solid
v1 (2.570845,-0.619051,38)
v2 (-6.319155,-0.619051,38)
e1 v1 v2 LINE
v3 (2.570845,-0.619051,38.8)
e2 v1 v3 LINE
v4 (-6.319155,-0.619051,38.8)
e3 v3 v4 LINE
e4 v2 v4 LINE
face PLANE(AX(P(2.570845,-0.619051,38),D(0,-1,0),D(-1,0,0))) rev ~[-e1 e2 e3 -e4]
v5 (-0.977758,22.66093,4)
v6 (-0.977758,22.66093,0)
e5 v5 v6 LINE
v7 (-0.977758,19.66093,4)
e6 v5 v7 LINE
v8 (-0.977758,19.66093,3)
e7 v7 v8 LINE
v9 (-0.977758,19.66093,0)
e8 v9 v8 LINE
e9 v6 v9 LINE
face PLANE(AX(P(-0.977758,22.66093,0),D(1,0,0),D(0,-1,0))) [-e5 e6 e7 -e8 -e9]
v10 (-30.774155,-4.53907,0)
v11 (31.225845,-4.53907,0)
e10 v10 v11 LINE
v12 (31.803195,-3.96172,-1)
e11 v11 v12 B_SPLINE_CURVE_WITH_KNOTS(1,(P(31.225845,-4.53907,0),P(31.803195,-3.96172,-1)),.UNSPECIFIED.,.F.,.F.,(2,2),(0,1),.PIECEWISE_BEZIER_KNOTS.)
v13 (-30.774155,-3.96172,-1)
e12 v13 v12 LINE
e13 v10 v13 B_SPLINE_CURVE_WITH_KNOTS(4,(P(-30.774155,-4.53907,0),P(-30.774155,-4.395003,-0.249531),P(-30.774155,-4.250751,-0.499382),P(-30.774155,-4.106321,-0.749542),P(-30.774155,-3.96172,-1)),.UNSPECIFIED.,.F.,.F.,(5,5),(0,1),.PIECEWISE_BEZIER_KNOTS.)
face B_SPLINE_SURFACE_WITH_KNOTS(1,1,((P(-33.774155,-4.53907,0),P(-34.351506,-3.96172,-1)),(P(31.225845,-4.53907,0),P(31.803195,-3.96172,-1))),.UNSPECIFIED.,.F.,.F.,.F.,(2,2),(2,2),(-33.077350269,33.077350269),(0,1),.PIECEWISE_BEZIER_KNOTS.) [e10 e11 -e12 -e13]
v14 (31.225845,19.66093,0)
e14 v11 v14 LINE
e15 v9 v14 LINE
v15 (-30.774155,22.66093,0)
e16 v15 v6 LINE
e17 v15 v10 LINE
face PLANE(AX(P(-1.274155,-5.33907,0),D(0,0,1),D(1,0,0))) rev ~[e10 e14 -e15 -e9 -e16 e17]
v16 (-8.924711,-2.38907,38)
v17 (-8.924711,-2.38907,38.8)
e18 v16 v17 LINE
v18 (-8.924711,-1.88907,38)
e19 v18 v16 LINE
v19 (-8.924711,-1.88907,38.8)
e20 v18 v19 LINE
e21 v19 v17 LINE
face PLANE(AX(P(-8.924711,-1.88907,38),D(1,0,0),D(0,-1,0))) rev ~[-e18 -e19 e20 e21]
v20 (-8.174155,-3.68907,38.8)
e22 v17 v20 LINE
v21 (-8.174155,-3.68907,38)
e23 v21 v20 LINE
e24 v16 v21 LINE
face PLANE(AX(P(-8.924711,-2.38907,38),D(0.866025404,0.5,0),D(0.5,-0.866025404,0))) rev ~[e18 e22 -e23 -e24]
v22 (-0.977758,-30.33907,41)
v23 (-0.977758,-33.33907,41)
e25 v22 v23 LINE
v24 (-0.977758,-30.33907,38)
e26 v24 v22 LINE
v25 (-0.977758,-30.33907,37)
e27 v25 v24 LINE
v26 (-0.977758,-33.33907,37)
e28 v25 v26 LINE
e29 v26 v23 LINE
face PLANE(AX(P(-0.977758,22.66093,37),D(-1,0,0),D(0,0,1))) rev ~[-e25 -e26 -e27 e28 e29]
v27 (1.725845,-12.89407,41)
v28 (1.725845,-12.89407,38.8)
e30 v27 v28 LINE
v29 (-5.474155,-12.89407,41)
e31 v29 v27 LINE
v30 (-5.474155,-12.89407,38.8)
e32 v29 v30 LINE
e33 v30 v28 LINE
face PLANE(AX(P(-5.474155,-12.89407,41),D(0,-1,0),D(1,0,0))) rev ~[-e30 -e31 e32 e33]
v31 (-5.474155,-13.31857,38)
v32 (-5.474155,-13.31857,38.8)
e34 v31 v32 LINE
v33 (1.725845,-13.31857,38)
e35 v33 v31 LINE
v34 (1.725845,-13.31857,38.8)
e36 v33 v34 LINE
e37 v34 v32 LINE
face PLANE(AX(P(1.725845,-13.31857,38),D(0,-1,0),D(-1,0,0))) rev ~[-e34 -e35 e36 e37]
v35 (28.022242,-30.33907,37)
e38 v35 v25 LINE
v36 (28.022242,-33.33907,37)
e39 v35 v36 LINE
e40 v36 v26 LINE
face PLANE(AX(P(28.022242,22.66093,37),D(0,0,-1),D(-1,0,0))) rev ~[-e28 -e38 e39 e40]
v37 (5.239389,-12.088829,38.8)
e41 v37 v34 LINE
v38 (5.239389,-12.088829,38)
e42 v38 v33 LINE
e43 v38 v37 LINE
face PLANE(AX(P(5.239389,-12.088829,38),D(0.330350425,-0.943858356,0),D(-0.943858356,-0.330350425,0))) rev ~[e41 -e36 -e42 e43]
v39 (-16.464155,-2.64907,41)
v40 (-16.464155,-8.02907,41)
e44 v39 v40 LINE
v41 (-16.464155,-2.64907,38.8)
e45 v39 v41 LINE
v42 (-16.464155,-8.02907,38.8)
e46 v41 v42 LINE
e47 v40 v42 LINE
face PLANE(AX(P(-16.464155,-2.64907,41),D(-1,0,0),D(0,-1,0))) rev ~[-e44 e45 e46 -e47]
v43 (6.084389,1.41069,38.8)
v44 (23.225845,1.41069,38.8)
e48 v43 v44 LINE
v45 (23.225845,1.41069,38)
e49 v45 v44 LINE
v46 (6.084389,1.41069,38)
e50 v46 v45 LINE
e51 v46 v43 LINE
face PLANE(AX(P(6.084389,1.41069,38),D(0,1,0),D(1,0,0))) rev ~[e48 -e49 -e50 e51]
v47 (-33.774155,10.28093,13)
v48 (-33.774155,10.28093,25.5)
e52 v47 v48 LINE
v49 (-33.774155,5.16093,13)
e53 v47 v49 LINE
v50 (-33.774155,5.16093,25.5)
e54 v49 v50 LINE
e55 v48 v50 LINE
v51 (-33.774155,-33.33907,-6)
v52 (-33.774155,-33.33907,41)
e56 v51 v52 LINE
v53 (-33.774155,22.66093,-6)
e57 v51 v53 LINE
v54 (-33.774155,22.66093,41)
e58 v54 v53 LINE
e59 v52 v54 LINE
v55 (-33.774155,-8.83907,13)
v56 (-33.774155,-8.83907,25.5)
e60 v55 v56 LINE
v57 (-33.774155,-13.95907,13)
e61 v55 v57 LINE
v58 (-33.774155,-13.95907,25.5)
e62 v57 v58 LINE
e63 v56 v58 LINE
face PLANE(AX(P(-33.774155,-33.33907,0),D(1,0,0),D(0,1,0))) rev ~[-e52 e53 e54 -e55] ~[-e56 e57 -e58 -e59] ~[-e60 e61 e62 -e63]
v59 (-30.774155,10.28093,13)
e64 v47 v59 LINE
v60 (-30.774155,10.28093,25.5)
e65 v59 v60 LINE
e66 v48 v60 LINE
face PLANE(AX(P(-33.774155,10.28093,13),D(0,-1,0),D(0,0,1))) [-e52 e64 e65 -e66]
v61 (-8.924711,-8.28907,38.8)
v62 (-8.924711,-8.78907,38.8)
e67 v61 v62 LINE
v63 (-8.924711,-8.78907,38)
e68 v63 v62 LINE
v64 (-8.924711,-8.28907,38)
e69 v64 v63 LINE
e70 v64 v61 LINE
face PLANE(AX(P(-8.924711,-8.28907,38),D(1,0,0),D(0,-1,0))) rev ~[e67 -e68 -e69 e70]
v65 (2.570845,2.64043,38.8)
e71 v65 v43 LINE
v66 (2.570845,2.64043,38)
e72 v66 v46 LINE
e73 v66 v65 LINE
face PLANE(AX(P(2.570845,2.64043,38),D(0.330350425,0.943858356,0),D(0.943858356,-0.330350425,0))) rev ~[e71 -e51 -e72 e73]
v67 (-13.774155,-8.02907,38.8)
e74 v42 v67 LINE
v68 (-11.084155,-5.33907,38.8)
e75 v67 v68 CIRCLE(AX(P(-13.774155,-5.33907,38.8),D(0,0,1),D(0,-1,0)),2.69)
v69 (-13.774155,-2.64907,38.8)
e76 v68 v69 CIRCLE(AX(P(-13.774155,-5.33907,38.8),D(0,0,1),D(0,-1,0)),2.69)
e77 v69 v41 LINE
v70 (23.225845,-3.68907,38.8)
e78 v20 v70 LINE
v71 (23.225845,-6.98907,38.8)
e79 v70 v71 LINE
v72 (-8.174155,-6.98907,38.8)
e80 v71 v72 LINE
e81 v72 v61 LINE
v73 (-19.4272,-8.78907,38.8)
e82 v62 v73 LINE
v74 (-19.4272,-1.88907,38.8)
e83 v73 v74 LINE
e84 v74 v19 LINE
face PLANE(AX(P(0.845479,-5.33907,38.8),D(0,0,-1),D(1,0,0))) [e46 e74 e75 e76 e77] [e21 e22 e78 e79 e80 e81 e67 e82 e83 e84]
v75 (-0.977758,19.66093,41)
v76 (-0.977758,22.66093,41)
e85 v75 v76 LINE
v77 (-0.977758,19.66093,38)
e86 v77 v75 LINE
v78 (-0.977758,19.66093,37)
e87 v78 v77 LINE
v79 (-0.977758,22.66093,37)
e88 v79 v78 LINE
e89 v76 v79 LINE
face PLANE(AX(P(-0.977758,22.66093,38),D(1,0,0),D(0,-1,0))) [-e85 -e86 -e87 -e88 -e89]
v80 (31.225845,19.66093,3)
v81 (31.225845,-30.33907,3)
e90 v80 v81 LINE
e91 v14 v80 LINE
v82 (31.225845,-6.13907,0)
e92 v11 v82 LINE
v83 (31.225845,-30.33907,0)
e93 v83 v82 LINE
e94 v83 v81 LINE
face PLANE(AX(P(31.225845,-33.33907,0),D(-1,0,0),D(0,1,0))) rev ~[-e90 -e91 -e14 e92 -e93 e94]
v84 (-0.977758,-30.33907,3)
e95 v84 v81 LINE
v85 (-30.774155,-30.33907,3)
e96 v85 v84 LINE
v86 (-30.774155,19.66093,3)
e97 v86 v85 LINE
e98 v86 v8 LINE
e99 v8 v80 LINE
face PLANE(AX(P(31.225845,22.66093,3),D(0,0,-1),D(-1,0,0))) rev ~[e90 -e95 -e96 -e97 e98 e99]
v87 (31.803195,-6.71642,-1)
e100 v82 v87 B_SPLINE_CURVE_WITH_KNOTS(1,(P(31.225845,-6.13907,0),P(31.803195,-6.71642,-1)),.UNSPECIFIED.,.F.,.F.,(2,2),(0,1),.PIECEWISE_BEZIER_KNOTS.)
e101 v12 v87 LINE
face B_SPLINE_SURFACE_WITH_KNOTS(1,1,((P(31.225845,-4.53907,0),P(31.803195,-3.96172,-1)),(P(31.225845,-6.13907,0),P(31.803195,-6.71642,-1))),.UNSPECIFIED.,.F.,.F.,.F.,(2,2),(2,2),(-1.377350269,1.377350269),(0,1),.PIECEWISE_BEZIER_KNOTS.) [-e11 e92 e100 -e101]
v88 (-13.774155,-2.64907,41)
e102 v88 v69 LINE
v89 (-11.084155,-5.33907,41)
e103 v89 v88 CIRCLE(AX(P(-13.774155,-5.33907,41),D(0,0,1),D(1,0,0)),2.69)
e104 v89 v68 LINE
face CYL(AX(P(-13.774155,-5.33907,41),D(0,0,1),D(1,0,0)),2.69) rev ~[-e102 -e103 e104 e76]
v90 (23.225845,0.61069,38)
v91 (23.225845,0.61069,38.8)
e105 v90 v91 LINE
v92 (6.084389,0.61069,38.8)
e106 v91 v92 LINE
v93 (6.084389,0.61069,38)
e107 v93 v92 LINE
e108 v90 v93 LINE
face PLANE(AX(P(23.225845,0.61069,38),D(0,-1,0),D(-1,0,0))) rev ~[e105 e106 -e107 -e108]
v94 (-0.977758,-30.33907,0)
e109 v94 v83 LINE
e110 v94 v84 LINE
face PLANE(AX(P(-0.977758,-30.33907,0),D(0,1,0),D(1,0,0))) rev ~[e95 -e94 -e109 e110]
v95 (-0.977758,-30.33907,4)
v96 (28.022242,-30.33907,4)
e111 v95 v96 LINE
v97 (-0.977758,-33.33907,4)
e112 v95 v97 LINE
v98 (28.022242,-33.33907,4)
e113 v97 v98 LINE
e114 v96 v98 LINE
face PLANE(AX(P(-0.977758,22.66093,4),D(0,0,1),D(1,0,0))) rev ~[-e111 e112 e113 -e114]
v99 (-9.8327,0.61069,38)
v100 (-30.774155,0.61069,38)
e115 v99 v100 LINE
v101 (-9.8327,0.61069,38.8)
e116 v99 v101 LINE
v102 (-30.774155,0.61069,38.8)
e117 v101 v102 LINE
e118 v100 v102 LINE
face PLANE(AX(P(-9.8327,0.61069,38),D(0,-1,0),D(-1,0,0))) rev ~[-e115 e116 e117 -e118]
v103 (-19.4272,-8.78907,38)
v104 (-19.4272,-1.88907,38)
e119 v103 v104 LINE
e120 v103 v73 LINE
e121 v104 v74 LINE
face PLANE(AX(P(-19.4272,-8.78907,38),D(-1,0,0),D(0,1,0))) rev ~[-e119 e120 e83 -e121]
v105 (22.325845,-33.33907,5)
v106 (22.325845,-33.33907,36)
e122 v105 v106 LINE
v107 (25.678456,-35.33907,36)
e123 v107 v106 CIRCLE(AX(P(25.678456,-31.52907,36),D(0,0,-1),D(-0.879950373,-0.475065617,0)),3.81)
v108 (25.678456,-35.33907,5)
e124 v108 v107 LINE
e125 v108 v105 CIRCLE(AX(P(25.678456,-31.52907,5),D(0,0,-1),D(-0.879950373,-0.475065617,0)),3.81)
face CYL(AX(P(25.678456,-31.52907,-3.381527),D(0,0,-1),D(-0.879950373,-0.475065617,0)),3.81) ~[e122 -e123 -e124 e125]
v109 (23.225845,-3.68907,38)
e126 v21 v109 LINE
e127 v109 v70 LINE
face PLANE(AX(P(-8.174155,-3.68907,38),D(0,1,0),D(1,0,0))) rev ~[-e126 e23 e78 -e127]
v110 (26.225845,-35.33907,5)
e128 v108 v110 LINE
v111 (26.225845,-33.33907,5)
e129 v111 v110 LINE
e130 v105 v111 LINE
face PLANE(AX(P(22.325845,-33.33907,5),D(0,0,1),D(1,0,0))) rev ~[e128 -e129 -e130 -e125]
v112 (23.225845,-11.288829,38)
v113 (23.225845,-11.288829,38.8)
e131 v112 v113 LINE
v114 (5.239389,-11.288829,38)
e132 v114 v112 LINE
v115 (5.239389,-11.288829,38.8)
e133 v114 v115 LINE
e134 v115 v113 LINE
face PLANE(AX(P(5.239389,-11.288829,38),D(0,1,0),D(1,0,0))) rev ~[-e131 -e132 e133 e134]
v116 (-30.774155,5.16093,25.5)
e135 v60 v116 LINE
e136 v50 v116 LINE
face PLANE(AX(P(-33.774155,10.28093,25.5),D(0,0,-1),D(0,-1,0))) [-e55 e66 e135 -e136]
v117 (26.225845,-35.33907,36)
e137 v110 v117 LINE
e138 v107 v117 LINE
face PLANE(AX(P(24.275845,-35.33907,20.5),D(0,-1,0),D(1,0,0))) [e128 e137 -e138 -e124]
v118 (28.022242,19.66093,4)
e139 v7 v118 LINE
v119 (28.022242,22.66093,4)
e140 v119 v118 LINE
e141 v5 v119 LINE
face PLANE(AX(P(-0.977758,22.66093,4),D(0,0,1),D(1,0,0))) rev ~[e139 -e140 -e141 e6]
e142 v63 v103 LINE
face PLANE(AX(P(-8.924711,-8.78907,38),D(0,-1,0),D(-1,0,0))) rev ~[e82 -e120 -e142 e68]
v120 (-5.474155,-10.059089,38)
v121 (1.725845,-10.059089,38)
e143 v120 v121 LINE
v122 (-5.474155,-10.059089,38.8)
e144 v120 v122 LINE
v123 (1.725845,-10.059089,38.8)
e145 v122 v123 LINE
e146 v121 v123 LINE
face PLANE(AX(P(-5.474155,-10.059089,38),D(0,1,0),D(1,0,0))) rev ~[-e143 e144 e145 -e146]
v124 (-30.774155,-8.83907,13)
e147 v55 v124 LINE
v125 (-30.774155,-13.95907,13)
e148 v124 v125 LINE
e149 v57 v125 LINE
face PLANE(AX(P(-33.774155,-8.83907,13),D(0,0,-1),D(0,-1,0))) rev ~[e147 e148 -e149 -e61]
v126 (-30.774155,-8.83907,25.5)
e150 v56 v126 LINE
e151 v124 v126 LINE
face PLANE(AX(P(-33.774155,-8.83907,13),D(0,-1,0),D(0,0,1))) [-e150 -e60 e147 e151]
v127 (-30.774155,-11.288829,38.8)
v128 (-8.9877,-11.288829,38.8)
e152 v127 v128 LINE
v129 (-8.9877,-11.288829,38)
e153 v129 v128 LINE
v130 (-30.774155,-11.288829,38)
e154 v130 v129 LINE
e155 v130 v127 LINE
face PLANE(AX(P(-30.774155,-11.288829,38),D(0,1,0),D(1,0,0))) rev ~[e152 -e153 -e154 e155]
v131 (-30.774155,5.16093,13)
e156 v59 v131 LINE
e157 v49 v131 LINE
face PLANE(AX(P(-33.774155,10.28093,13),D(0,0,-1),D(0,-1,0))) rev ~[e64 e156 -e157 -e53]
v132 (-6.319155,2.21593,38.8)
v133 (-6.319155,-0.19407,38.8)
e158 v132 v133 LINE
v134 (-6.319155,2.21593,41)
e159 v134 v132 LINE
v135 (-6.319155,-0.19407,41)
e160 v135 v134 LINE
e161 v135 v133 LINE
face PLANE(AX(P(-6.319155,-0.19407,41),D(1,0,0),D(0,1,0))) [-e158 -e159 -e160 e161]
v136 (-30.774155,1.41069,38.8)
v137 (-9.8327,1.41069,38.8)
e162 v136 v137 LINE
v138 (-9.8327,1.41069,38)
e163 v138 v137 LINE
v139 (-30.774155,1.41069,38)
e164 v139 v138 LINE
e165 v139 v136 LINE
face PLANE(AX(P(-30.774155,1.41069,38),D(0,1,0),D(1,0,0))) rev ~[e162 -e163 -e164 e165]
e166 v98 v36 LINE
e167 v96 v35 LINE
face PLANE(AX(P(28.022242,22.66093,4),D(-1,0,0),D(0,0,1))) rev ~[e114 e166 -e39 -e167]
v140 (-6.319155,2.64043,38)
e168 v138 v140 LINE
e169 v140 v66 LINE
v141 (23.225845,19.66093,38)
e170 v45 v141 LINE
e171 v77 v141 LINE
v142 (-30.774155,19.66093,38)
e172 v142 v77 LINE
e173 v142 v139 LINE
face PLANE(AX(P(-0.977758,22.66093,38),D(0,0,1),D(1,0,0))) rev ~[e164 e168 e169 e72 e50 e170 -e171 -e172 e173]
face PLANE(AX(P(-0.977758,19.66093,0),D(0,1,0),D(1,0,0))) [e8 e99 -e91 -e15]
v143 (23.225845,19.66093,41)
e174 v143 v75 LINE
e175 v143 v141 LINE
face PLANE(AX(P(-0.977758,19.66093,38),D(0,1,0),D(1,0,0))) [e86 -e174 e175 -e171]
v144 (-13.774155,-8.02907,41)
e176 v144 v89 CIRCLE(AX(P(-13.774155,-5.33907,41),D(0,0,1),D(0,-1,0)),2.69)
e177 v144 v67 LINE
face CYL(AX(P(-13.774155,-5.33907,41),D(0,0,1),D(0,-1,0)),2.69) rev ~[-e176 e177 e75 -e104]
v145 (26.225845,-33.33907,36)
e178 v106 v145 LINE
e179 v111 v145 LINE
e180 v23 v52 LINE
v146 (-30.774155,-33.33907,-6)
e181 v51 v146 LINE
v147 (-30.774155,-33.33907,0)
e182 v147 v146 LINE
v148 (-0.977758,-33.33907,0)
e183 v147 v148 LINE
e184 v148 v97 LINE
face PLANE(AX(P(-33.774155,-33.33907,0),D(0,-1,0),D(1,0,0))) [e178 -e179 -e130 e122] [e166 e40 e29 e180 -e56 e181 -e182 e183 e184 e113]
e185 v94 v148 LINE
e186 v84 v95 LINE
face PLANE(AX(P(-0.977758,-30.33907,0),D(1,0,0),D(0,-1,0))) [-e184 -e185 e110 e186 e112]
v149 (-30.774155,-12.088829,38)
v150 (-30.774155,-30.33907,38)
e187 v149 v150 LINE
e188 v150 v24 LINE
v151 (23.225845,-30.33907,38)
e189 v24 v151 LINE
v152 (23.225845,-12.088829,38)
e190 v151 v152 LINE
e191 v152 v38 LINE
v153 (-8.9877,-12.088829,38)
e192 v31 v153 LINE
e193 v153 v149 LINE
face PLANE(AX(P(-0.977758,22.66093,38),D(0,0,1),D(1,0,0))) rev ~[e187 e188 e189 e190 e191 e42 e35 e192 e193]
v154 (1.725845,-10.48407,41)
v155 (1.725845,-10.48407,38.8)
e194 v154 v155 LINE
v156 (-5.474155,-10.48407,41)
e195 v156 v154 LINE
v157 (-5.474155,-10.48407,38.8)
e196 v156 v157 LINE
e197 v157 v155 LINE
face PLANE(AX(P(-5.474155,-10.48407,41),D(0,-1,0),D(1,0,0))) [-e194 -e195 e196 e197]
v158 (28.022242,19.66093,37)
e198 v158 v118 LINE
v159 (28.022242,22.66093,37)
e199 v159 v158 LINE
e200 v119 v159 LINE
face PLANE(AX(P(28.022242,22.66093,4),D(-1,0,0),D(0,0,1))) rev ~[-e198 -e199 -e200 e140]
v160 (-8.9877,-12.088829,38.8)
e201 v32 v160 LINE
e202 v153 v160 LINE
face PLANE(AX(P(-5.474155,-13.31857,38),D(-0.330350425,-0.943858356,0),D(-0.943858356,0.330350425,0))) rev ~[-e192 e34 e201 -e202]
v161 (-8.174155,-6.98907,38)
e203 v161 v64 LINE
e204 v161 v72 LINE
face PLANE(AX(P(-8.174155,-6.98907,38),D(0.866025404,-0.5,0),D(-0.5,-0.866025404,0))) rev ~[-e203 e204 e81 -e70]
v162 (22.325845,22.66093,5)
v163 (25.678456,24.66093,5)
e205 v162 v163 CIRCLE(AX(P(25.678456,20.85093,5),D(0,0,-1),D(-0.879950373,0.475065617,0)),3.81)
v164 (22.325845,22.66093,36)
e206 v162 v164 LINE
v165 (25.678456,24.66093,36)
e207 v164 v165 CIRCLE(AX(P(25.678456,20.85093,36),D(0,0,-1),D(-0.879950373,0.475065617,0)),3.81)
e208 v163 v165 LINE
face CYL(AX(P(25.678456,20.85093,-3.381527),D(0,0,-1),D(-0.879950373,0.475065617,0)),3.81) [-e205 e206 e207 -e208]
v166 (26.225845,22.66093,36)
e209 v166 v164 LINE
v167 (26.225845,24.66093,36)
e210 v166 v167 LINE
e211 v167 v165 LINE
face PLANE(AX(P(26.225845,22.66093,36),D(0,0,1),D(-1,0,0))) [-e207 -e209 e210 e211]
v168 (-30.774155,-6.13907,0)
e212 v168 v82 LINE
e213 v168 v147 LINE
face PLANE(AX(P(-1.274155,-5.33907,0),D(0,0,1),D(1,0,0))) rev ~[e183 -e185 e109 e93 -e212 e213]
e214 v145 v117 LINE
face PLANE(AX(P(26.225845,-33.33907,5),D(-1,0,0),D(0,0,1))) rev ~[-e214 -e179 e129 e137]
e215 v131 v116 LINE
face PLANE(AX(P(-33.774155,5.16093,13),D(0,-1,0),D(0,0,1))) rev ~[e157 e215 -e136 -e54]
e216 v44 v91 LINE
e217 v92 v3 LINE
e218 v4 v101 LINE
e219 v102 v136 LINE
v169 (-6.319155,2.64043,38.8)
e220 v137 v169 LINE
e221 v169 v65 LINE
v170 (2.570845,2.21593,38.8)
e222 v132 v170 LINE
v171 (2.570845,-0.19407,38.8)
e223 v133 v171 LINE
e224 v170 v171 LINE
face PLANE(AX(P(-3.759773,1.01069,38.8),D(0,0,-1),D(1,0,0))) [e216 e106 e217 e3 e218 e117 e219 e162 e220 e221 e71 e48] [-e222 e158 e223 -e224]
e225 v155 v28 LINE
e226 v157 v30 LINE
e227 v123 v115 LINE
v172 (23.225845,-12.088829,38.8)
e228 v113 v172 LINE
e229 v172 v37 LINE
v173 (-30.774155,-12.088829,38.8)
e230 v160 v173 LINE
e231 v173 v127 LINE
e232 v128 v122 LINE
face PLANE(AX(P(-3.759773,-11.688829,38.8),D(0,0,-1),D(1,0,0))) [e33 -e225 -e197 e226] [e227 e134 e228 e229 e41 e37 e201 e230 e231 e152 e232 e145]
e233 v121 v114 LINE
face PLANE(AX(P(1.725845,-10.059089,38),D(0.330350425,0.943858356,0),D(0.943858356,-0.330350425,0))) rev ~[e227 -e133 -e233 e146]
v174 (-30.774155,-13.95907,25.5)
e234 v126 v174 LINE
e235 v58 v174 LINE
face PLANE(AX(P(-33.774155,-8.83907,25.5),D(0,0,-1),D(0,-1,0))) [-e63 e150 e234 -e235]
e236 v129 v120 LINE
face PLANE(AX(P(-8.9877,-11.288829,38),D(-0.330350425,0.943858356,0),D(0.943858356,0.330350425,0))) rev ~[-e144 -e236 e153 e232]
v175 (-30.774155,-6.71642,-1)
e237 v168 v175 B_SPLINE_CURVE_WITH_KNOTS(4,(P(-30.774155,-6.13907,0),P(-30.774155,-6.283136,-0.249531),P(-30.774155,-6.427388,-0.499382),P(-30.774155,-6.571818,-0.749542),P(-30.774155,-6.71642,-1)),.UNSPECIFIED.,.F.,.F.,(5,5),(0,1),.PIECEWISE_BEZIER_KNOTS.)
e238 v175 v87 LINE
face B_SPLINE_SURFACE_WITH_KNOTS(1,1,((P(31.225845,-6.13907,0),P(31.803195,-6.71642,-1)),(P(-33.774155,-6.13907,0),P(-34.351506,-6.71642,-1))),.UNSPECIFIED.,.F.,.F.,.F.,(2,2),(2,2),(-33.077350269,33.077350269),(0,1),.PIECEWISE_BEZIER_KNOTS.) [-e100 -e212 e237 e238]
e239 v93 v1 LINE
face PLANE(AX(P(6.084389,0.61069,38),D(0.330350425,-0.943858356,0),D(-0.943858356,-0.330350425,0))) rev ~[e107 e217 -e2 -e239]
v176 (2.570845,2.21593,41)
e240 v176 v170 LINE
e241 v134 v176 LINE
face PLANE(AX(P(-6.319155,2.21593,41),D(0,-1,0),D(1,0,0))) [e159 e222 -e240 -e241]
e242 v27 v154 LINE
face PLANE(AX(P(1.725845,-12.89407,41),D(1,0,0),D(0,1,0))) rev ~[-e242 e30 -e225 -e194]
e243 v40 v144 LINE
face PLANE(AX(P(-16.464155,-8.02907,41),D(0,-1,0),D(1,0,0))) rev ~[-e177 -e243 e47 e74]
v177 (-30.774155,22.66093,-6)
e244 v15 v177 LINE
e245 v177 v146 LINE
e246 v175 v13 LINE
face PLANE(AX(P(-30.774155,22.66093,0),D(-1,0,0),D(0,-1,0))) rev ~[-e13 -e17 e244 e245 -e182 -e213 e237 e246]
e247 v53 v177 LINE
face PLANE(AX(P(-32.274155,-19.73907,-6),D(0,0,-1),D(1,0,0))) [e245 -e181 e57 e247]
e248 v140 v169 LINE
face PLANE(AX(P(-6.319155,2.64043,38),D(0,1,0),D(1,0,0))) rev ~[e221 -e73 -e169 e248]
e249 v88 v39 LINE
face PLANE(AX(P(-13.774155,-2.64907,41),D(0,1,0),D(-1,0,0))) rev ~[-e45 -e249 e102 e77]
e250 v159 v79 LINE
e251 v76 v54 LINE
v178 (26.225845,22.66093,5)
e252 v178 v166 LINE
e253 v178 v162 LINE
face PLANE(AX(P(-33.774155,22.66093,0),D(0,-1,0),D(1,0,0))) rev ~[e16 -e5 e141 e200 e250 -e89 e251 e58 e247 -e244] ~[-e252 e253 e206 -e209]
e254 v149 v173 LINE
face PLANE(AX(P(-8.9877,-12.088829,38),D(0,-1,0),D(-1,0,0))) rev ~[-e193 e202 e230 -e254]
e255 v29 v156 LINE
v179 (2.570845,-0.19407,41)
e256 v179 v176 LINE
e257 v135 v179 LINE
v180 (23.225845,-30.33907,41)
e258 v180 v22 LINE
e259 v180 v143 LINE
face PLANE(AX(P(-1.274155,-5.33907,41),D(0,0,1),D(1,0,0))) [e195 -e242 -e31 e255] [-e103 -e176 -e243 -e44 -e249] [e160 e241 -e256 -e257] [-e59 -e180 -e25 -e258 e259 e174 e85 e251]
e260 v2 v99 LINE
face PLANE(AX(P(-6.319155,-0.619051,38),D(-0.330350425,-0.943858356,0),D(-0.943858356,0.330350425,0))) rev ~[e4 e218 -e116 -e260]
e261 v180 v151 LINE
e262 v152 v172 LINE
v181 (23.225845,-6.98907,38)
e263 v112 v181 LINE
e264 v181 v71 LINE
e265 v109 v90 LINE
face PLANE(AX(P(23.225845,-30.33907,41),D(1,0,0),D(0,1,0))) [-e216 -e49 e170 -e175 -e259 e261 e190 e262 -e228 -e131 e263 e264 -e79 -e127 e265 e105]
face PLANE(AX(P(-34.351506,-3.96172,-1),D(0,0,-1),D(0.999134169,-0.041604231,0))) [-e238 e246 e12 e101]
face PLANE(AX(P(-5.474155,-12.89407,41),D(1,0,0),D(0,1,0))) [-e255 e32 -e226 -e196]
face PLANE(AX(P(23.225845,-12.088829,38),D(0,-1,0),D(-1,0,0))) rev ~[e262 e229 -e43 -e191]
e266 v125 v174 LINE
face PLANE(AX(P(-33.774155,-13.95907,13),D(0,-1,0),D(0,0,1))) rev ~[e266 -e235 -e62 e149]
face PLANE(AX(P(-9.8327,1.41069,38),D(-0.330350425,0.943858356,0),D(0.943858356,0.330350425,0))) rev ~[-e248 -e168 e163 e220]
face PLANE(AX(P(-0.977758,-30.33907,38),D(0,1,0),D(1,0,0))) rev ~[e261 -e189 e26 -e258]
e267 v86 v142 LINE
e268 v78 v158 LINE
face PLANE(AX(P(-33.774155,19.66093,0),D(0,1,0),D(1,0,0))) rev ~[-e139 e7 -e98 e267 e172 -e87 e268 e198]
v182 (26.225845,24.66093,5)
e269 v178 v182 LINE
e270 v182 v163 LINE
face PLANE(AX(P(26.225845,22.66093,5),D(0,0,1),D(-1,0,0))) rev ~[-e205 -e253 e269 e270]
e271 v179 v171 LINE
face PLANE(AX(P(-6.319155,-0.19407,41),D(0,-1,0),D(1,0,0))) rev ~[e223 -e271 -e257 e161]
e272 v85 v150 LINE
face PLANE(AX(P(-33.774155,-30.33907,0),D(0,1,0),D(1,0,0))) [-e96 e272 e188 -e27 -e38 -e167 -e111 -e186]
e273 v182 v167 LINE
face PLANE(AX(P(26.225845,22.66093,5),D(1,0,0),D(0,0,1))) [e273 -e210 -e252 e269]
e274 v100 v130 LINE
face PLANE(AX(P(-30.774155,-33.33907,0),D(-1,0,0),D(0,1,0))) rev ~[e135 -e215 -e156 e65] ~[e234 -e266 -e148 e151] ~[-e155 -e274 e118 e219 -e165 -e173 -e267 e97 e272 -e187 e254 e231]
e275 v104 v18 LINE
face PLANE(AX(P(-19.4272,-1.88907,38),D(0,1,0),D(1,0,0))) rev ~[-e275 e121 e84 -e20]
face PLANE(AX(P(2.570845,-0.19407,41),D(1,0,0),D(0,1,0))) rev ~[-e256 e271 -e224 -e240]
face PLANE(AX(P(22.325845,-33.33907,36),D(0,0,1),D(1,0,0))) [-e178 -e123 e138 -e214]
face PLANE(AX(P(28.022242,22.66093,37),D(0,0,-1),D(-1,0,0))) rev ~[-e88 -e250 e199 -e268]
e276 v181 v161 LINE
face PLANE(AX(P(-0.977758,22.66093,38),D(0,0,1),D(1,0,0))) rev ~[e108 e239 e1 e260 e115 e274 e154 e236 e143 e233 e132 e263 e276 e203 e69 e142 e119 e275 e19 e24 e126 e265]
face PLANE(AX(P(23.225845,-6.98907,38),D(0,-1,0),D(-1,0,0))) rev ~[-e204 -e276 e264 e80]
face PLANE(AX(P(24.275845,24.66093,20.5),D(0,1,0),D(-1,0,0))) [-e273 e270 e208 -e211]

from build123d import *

# Parameters (mm, degrees)
F0_W        = 65
F0_H        = 56
F1_DEPTH    = 41
F2_T        = -3
F3_W        = 5.12
F3_H        = 12.5
F4_DEPTH    = 4.318
F5_W        = 3.9
F5_H        = 31
F6_DEPTH    = 2
F7_W        = 3.9
F7_H        = 31
F8_DEPTH    = 2
F9_T1_DEPTH = 47.7630546142
F11_DEPTH   = 66.294
F12_W       = 8
F12_H       = 50
F13_DEPTH   = 14.732
F14_W       = 8.89
F14_H       = 2.41
F14_W_2     = 7.2
F15_DEPTH   = 25
F16_W       = 7.2
F16_H       = 2.41
F17_DEPTH   = 0.8
F18_W       = 32.2036024
F18_H       = 3
F19_DEPTH   = 25
F20_W       = 32.2036024
F20_H       = 3
F21_DEPTH   = 3.5
F22_W       = 65
F22_H       = 1.6
F23_DEPTH   = 1
F23_TAPER   = -30
F25_DEPTH   = 0.8
F26_W       = 8.89
F26_H       = 2.41
F27_DEPTH   = 0.8
F28_W       = 0.5773502692
F28_H       = 2.7547005384
F29_DEPTH   = 25
F30_W       = 3
F30_H       = 27.2
F30_H_2     = 28.8
F31_DEPTH   = 6


# Not quite as in the source:
# - a fillet or chamfer that OpenCascade refuses, or shapes differently, is made with other operations: its cross-section is extruded or revolved along the edge and cut away or added


with BuildPart() as f1:
    # F0 (on Top) → F1 (new body)
    with BuildSketch(Plane.XY):
        with Locations((-1.2741552845, -5.3390697837)):
            Rectangle(F0_W, F0_H)
    extrude(amount=F1_DEPTH)

    # F2
    f2_openings = [f1.faces().sort_by_distance(p)[0] for p in [
        (31.225845, -5.33907, 20.5),
    ]]
    offset(amount=F2_T, openings=f2_openings)

    # F3 (on face) → F4 (cut)
    with BuildSketch(Plane(origin=(-33.7741552845, 0, 0), x_dir=(0, -1, 0), z_dir=(-1, 0, 0))):
        with Locations((-7.7209302163, 19.25)):
            Rectangle(F3_W, F3_H)
        with Locations((11.3990697837, 19.25)):
            Rectangle(F3_W, F3_H)
    extrude(amount=-F4_DEPTH, mode=Mode.SUBTRACT)

    # F5 (on face) → F6 (join)
    with BuildSketch(Plane(origin=(0, 22.6609302163, 0), x_dir=(-1, 0, 0), z_dir=(0, 1, 0))):
        with Locations((-24.2758447155, 20.5)):
            Rectangle(F5_W, F5_H)
    extrude(amount=F6_DEPTH)

    # F7 (on face) → F8 (join)
    with BuildSketch(Plane.XZ.offset(33.3390697837)):
        with Locations((24.2758447155, 20.5)):
            Rectangle(F7_W, F7_H)
    extrude(amount=F8_DEPTH)

    # F9: fillet of radius 3.81 on 2 edges, made by hand

    # F9_s2 → F9_t1 (cut)
    with BuildSketch(Plane.XY.offset(-3.3815273071)):
        with BuildLine():
            ThreePointArc((22.3258447155, 22.6609302163), (23.7265335088, 24.1229479424), (25.6784556384, 24.6609302163))
            Line((25.6784556384, 24.6609302163), (22.3258447155, 24.6609302163))
            Line((22.3258447155, 24.6609302163), (22.3258447155, 22.6609302163))
        make_face()
        with BuildLine():
            ThreePointArc((22.3258447155, -33.3390697837), (23.7265335088, -34.8010875098), (25.6784556384, -35.3390697837))
            Line((25.6784556384, -35.3390697837), (22.3258447155, -35.3390697837))
            Line((22.3258447155, -35.3390697837), (22.3258447155, -33.3390697837))
        make_face()
    extrude(amount=F9_T1_DEPTH, mode=Mode.SUBTRACT)

    # F10 (on face) → F11 (cut)
    with BuildSketch(Plane(origin=(0, 22.6609302163, 0), x_dir=(-1, 0, 0), z_dir=(0, 1, 0))):
        Polygon((0.9777576845, 38), (-31.2258447155, 38), (-31.2258447155, 3), (0.9777576845, 3), (0.9777576845, 4), (-28.0222423155, 4), (-28.0222423155, 37), (0.9777576845, 37), align=None)
    extrude(amount=-F11_DEPTH, mode=Mode.SUBTRACT)

    # F12 (on face) → F13 (cut)
    with BuildSketch(Plane.XY.offset(41)):
        with Locations((27.2258447155, -5.3390697837)):
            Rectangle(F12_W, F12_H)
    extrude(amount=-F13_DEPTH, mode=Mode.SUBTRACT)

    # F14 (on face) → F15 (cut)
    with BuildSketch(Plane.XY.offset(41)):
        with Locations((-1.8741552845, 1.0109302163)):
            Rectangle(F14_W, F14_H)
        with BuildLine():
            ThreePointArc((-13.7741552845, -8.0290697837), (-11.8720380431, -7.2411870251), (-11.0841552845, -5.3390697837))
            ThreePointArc((-11.0841552845, -5.3390697837), (-11.8720380431, -3.4369525423), (-13.7741552845, -2.6490697837))
            ThreePointArc((-13.7741552845, -2.6490697837), (-15.6762725259, -3.4369525423), (-16.4641552845, -5.3390697837))
            ThreePointArc((-16.4641552845, -5.3390697837), (-15.6762725259, -7.2411870251), (-13.7741552845, -8.0290697837))
        make_face()
        with Locations((-1.8741552845, -11.6890697837)):
            Rectangle(F14_W_2, F14_H)
        with BuildLine():
            ThreePointArc((-16.4641552845, -5.3390697837), (-15.6762725259, -3.4369525423), (-13.7741552845, -2.6490697837))
            Line((-13.7741552845, -2.6490697837), (-16.4641552845, -2.6490697837))
            Line((-16.4641552845, -2.6490697837), (-16.4641552845, -5.3390697837))
        make_face()
        with BuildLine():
            Line((-16.4641552845, -8.0290697837), (-13.7741552845, -8.0290697837))
            ThreePointArc((-13.7741552845, -8.0290697837), (-15.6762725259, -7.2411870251), (-16.4641552845, -5.3390697837))
            Line((-16.4641552845, -5.3390697837), (-16.4641552845, -8.0290697837))
        make_face()
    extrude(amount=-F15_DEPTH, mode=Mode.SUBTRACT)

    # F16 (on face) → F17 (cut)
    with BuildSketch(Plane(origin=(0, 0, 38), x_dir=(1, 0, 0), z_dir=(0, 0, -1))):
        Polygon((-30.7741552845, 12.0888292812), (-30.7741552845, 11.2888292812), (-8.9876995774, 11.2888292812), (-5.4741552845, 10.0590887787), (1.7258447155, 10.0590887787), (5.2393890084, 11.2888292812), (23.2258447155, 11.2888292812), (23.2258447155, 12.0888292812), (5.2393890084, 12.0888292812), (1.7258447155, 13.3185697837), (-5.4741552845, 13.3185697837), (-8.9876995774, 12.0888292812), align=None)
        with Locations((-1.8741552845, 11.6890697837)):
            Rectangle(F16_W, F16_H, mode=Mode.SUBTRACT)
    extrude(amount=-F17_DEPTH, mode=Mode.SUBTRACT)

    # F18 (on face) → F19 (cut)
    with BuildSketch(Plane(origin=(0, 0, 38), x_dir=(1, 0, 0), z_dir=(0, 0, -1))):
        with Locations((15.1240435155, -21.1609302163)):
            Rectangle(F18_W, F18_H)
        Polygon((-0.9777576845, 33.3390697837), (-0.9777576845, 30.3390697837), (23.2258447155, 30.3390697837), (31.2258447155, 30.3390697837), (31.2258447155, 33.3390697837), align=None)
    extrude(amount=-F19_DEPTH, mode=Mode.SUBTRACT)

    # F20 (on face) → F21 (cut)
    with BuildSketch(Plane(origin=(0, 0, 0), x_dir=(1, 0, 0), z_dir=(0, 0, -1))):
        with Locations((15.1240435155, -21.1609302163)):
            Rectangle(F20_W, F20_H)
        with Locations((15.1240435155, 31.8390697837)):
            Rectangle(F20_W, F20_H)
    extrude(amount=-F21_DEPTH, mode=Mode.SUBTRACT)

    # F22 (on face) → F23 (join)
    with BuildSketch(Plane(origin=(0, 0, 0), x_dir=(1, 0, 0), z_dir=(0, 0, -1))):
        with Locations((-1.2741552845, 5.3390697837)):
            Rectangle(F22_W, F22_H)
    extrude(amount=F23_DEPTH, taper=F23_TAPER)

    # F24 (on face) → F25 (cut)
    with BuildSketch(Plane(origin=(0, 0, 38), x_dir=(1, 0, 0), z_dir=(0, 0, -1))):
        Polygon((23.2258447155, 3.6890697837), (23.2258447155, 6.9890697837), (-8.1741552845, 6.9890697837), (-8.9247106344, 8.2890697837), (-8.9247106344, 8.7890697837), (-19.4271999345, 8.7890697837), (-19.4271999345, 1.8890697837), (-8.9247106344, 1.8890697837), (-8.9247106344, 2.3890697837), (-8.1741552845, 3.6890697837), align=None)
        with BuildLine():
            Line((-16.4641552845, 8.0290697837), (-13.7741552845, 8.0290697837))
            ThreePointArc((-13.7741552845, 8.0290697837), (-11.0841552845, 5.3390697837), (-13.7741552845, 2.6490697837))
            Line((-13.7741552845, 2.6490697837), (-16.4641552845, 2.6490697837))
            Line((-16.4641552845, 2.6490697837), (-16.4641552845, 8.0290697837))
        make_face(mode=Mode.SUBTRACT)
    extrude(amount=-F25_DEPTH, mode=Mode.SUBTRACT)

    # F26 (on face) → F27 (cut)
    with BuildSketch(Plane(origin=(0, 0, 38), x_dir=(1, 0, 0), z_dir=(0, 0, -1))):
        Polygon((-30.7741552845, -0.6106897138), (-30.7741552845, -1.4106897138), (-9.8326995774, -1.4106897138), (-6.3191552845, -2.6404302163), (2.5708447155, -2.6404302163), (6.0843890084, -1.4106897138), (23.2258447155, -1.4106897138), (23.2258447155, -0.6106897138), (6.0843890084, -0.6106897138), (2.5708447155, 0.6190507887), (-6.3191552845, 0.6190507887), (-9.8326995774, -0.6106897138), align=None)
        with Locations((-1.8741552845, -1.0109302163)):
            Rectangle(F26_W, F26_H, mode=Mode.SUBTRACT)
    extrude(amount=-F27_DEPTH, mode=Mode.SUBTRACT)

    # F28 (on face) → F29 (cut)
    with BuildSketch(Plane(origin=(0, 0, -1), x_dir=(1, 0, 0), z_dir=(0, 0, -1))):
        with Locations((-34.0628304191, 5.3390697837)):
            Rectangle(F28_W, F28_H)
    extrude(amount=-F29_DEPTH, mode=Mode.SUBTRACT)

    # F30 (on face) → F31 (join)
    with BuildSketch(Plane(origin=(0, 0, 0), x_dir=(1, 0, 0), z_dir=(0, 0, -1))):
        with Locations((-32.2741552845, 19.7390697837)):
            Rectangle(F30_W, F30_H)
        with Locations((-32.2741552845, -8.2609302163)):
            Rectangle(F30_W, F30_H_2)
    extrude(amount=F31_DEPTH)


solid = f1.part
